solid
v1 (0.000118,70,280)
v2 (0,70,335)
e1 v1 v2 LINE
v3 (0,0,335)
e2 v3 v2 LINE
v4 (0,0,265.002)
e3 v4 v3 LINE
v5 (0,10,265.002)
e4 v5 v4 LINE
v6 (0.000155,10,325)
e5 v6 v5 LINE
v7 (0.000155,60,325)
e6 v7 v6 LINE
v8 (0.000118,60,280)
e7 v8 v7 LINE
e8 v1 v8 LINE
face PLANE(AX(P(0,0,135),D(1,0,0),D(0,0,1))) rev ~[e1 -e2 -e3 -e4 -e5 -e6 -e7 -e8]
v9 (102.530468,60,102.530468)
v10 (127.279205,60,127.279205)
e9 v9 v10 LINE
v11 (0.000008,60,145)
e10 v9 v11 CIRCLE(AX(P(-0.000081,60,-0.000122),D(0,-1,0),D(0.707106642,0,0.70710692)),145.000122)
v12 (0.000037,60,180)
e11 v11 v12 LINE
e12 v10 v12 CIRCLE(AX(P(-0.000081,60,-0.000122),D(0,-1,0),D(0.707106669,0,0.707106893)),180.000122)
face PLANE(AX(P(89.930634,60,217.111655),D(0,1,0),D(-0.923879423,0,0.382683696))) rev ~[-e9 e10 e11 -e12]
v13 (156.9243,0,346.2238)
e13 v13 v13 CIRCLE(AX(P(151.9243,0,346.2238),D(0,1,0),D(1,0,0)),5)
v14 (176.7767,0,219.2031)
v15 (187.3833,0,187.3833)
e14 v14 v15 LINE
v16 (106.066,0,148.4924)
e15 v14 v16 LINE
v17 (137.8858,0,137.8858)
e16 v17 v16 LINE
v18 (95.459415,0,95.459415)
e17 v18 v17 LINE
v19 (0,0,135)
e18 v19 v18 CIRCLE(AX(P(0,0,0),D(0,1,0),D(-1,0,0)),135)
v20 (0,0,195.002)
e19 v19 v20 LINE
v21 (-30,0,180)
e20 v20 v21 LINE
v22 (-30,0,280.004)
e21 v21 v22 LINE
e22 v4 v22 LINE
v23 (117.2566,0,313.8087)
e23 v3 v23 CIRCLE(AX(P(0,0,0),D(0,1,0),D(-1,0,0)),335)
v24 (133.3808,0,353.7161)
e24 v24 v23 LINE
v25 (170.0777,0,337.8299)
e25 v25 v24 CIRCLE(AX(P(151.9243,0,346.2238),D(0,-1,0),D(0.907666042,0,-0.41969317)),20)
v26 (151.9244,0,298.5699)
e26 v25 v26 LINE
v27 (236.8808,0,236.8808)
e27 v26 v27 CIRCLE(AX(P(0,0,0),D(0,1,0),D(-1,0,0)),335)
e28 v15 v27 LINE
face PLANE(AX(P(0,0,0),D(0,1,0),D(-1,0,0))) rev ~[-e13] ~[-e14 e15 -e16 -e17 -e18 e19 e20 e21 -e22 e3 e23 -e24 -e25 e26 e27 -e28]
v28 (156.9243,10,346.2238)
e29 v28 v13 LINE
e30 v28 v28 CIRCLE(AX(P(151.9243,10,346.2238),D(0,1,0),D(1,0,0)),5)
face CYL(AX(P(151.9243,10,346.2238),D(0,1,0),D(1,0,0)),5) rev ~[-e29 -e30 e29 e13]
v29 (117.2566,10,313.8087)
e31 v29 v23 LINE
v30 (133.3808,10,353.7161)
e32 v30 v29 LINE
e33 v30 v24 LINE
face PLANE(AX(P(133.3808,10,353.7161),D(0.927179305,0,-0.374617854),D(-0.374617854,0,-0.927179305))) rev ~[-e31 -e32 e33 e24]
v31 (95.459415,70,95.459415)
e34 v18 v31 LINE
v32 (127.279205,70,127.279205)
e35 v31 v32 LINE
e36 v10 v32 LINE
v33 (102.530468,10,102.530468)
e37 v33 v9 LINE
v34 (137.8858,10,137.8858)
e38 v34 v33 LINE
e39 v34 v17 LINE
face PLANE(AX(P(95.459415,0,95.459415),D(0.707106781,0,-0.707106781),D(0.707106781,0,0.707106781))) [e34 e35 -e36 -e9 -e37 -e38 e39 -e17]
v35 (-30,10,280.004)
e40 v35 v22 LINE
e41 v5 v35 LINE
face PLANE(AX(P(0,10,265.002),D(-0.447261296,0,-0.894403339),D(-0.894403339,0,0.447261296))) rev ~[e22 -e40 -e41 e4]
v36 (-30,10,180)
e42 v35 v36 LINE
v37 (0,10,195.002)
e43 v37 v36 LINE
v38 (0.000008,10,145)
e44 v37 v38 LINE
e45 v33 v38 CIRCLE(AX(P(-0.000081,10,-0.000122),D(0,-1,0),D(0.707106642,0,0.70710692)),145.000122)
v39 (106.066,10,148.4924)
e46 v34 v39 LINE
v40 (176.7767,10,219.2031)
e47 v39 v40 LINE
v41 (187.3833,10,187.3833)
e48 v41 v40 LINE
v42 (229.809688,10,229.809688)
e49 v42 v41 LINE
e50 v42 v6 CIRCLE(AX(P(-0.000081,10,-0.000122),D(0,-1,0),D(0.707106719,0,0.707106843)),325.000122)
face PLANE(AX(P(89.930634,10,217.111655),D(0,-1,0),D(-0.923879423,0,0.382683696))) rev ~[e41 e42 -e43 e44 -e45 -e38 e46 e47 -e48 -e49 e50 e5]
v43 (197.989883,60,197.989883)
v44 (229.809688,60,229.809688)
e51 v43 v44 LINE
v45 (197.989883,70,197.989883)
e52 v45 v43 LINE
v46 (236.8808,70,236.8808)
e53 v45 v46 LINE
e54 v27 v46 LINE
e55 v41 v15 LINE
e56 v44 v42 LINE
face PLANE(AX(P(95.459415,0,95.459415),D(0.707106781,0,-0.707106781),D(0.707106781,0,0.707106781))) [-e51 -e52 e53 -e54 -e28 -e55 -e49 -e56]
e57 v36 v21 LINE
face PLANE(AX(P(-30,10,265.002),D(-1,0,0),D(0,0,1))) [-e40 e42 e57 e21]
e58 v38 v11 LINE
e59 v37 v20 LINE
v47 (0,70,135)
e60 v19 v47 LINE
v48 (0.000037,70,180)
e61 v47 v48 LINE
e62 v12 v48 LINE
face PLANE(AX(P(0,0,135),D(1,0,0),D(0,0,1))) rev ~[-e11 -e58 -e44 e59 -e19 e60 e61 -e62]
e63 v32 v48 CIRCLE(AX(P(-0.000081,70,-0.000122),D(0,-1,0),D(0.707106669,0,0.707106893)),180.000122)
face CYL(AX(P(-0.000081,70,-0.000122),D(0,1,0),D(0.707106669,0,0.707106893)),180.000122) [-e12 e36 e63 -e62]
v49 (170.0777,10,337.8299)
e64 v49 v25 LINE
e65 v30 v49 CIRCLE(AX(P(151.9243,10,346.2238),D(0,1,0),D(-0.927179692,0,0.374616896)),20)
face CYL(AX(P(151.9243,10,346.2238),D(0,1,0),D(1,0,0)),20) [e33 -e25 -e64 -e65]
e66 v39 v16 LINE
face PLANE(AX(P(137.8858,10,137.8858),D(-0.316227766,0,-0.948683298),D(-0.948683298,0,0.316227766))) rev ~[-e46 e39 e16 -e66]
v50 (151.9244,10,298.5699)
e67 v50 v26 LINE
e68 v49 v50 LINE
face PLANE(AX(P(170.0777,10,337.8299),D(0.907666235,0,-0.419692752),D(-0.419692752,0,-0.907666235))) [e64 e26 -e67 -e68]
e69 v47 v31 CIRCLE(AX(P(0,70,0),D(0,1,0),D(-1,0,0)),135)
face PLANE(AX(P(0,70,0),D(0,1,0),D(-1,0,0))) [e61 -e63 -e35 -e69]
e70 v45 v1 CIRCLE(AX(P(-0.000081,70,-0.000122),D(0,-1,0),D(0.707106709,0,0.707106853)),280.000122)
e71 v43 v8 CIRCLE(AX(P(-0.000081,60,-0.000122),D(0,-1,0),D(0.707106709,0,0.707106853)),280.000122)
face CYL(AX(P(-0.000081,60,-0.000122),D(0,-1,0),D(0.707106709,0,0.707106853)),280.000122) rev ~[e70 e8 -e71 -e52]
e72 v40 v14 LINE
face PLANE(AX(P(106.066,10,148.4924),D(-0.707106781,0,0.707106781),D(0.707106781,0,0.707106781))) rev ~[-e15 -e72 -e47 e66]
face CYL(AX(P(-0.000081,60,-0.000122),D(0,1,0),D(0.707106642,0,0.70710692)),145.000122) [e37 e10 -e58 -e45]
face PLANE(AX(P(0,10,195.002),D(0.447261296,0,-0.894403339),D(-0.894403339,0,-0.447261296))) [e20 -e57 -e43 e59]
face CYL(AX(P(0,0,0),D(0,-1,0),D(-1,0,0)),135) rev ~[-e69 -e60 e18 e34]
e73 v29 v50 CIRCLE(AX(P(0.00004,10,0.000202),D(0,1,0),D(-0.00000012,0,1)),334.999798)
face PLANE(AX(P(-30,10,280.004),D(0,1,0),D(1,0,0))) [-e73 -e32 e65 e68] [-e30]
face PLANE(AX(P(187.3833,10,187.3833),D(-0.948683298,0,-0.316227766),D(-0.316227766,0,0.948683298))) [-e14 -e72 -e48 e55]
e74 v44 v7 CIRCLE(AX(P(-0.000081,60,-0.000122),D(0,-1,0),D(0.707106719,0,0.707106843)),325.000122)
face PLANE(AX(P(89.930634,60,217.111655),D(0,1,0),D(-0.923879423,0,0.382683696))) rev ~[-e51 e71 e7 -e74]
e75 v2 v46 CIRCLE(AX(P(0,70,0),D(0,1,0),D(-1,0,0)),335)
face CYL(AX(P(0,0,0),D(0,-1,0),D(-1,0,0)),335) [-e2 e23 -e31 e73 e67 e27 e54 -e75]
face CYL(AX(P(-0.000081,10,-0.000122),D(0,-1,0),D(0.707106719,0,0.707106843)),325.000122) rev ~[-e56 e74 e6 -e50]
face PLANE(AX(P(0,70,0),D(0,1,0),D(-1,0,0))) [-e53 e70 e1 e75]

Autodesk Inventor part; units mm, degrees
ref_plane "YZ Plane" through (0, 0, 0) normal (1, 0, 0) x (0, 1, 0)
ref_plane "XZ Plane" through (0, 0, 0) normal (0, 1, 0) x (-1, 0, 0)
ref_plane "XY Plane" through (0, 0, 0) normal (0, 0, 1) x (1, 0, 0)
sketch "Sketch1" plane through (0, 0, 0) normal (0, 1, 0) x (-1, 0, 0)
  circle A0 centre (0, 0) radius 335
  line L0 (335, 0) -> (-335, 0)
  line L1 (0, -335) -> (0, 335)
  line L2 (0, 0) -> (-236.8808, 236.8808)
  line L3 (0, 0) -> (236.8808, -236.8808)
  line L4 (0, 0) -> (236.8808, 236.8808)
  line L5 (0, 0) -> (-236.8808, -236.8808)
  circle A1 centre (0, 0) radius 135
  point P0 (-95.4594, 95.4594)
  point P1 (0, 135)
  dimension "d0" = 670
  dimension "d1" = 45
  dimension "d2" = 45
  dimension "d17" = 200
extrude "Extrusion1" add sketch "Sketch1" along normal blind 70 contours L1 A1 L2 A0
sketch "Sketch2" plane through (95.4594, 0, 95.4594) normal (0.7071068, 0, -0.7071068) x (-0.7071068, 0, -0.7071068)
  line L0 (-190, 60) -> (-10, 60)
  line L1 (-10, 60) -> (-10, 10)
  line L2 (-10, 10) -> (-190, 10)
  line L3 (-190, 10) -> (-190, 60)
  line L4 (-200, 0) -> (0, 0) projected
  line L5 (-200, 70) -> (0, 70) projected
  line L6 (-200, 0) -> (-200, 70) projected
  line L7 (0, 0) -> (0, 70) projected
  point P0 (135, 0)
  point P1 (0, 35)
  dimension "d6" = 10
  dimension "d7" = 10
  dimension "d8" = 10
  dimension "d9" = 10
sketch3d "3D Sketch1"
  arc A0 (95.4594, 70, 95.4594) -> (0, 70, 135) centre (0, 70, 0) ccw
sweep "Sweep1" cut profiles "Sketch2" path "3D Sketch1" contours L0 L1 L2 L3
sketch "Sketch3" plane through (95.4594, 0, 95.4594) normal (0.7071068, 0, -0.7071068) x (-0.7071068, 0, -0.7071068)
  line L0 (-101.8808, 70) -> (-200, 70) projected
  line L1 (32.4695, 60) -> (-94.8097, 60) projected
  line L2 (-145, 70) -> (-45, 70)
  line L3 (-45, 70) -> (-45, 60)
  line L4 (-45, 60) -> (-145, 60)
  line L5 (-145, 60) -> (-145, 70)
  line L6 (-200, 0) -> (-200, 70) projected
  line L7 (0, 0) -> (0, 70) projected
  point P0 (135, 0)
  dimension "d16" = 100
  dimension "d18" = 45
sketch3d "3D Sketch2"
  arc A0 (95.4594, 70, 95.4594) -> (0, 70, 135) centre (0, 70, 0) ccw
sweep "Sweep2" cut profiles "Sketch3" path "3D Sketch2"
sketch "Sketch5" plane through (0, 10, 325) normal (0, 1, 0) x (1, 0, 0)
  line L0 (0, 0) -> (0, 180) projected
  arc A0 (0, 145) -> (127.2792, 197.7208) centre (0, 325) ccw projected
  line L1 (127.2792, 197.7208) -> (95.4594, 229.5406) projected
  arc A1 (0, 190) -> (95.4594, 229.5406) centre (0, 325) ccw projected
  line L2 (0, 190) -> (0, 145) projected
  arc A2 (0, 45) -> (197.9899, 127.0101) centre (0, 325) ccw projected
  line L3 (0, 45) -> (0, -10) projected
  arc A3 (0, -10) -> (236.8808, 88.1192) centre (0, 325) ccw projected
  line L4 (236.8808, 88.1192) -> (197.9899, 127.0101) projected
  line L5 (0, 145) -> (-30, 145)
  line L6 (-30, 145) -> (-30, 44.996)
  line L7 (-30, 44.996) -> (0, 44.996)
  line L8 (0, 44.996) -> (0, 145)
  line L9 (0, 190) -> (0, -10) projected
  line L10 (0, 129.998) -> (-30, 129.998)
  line L11 (-30, 129.998) -> (-30, 59.998)
  line L12 (-30, 59.998) -> (0, 59.998)
  line L13 (0, 59.998) -> (0, 129.998)
  line L14 (0, 44.996) -> (-30, 145) construction
  line L15 (0, 145) -> (-30, 44.996) construction
  line L16 (0, 59.998) -> (-30, 129.998) construction
  line L17 (-30, 59.998) -> (0, 129.998) construction
  line L18 (-15, 94.998) -> (-30, 94.998) construction
  line L19 (-15, 94.998) -> (-30, 94.998) construction
  line L20 (0, 59.998) -> (-30, 44.996)
  line L21 (0, 129.998) -> (-30, 145)
  point P0 (0, 44.996)
  point P1 (0, 59.998)
  dimension "d21" = 30
  dimension "d27" = 70
extrude "Extrusion2" add sketch "Sketch5" against normal blind 10 contours L6 L12 L20 | L12 L6 L10 L0 | L10 L6 L21
sketch "Sketch6" plane through (-30, 10, 280.004) normal (0, 1, 0) x (1, 0, 0)
  line L0 (132.5305, 177.4736) -> (259.8097, 50.1943) projected
  arc A0 (30, 135.004) -> (132.5305, 177.4736) centre (30, 280.004) ccw projected
  line L1 (30, 85.002) -> (30, 135.004) projected
  line L2 (0, 100.004) -> (0, 0) projected
  line L3 (30, -44.996) -> (30, 15.002) projected
  arc A1 (30, -44.996) -> (259.8097, 50.1943) centre (30, 280.004) ccw projected
  arc A2 (30, 100.004) -> (157.2792, 152.7248) centre (30, 280.004) ccw projected
  line L4 (157.2792, 152.7248) -> (136.066, 131.5116)
  line L5 (136.066, 131.5116) -> (206.7767, 60.8009)
  line L6 (206.7767, 60.8009) -> (227.9899, 82.0141)
  line L7 (227.9899, 82.0141) -> (157.2792, 152.7248)
  arc A3 (30, 100.004) -> (157.2792, 152.7248) centre (30, 280.004) ccw projected
  arc A4 (30, 0.004) -> (227.9899, 82.0141) centre (30, 280.004) ccw projected
  line L8 (30, 0.004) -> (30, -54.996) projected
  arc A5 (30, -54.996) -> (266.8808, 43.1233) centre (30, 280.004) ccw projected
  line L9 (266.8808, 43.1233) -> (227.9899, 82.0141) projected
  arc A6 (30, 100.004) -> (157.2792, 152.7248) centre (30, 280.004) ccw projected
  line L10 (157.2792, 152.7248) -> (125.4594, 184.5446) projected
  arc A7 (30, 145.004) -> (125.4594, 184.5446) centre (30, 280.004) ccw projected
  line L11 (30, 145.004) -> (30, 100.004) projected
  line L12 (167.8858, 142.1182) -> (146.6726, 120.905)
  line L13 (146.6726, 120.905) -> (196.1701, 71.4075)
  line L14 (196.1701, 71.4075) -> (217.3833, 92.6207)
  line L15 (217.3833, 92.6207) -> (167.8858, 142.1182)
  line L16 (167.8858, 142.1182) -> (196.1701, 71.4075) construction
  line L17 (217.3833, 92.6207) -> (146.6726, 120.905) construction
  line L18 (157.2792, 152.7248) -> (206.7767, 60.8009) construction
  line L19 (227.9899, 82.0141) -> (136.066, 131.5116) construction
  line L20 (182.028, 106.7629) -> (171.4214, 96.1563) construction
  line L21 (182.028, 106.7629) -> (171.4214, 96.1563) construction
  line L22 (217.3833, 92.6207) -> (206.7767, 60.8009)
  line L23 (167.8858, 142.1182) -> (136.066, 131.5116)
  line L24 (30, 85.002) -> (0, 100.004) projected
  line L25 (0, 0) -> (30, 15.002) projected
  point P0 (207.7219, 63.6364)
  point P1 (217.3833, 92.6207)
  point P2 (167.8858, 142.1182)
  point P3 (205.637, 61.9406)
  dimension "d23" = 30
  dimension "d24" = 70
extrude "Extrusion3" cut sketch "Sketch6" against normal blind 10 contours L0 L14 L5 L12 | L12 L5 L23 | L22 A4 L5 L14 | L22 L5 A4
sketch "Sketch7" plane through (-30, 10, 280.004) normal (0, 1, 0) x (1, 0, 0)
  arc A0 (30, -44.996) -> (259.8097, 50.1943) centre (30, 280.004) ccw projected
  arc A1 (30, 0.004) -> (227.9899, 82.0141) centre (30, 280.004) ccw projected
  line L0 (30, 0.004) -> (30, -54.996) projected
  arc A2 (30, -54.996) -> (266.8808, 43.1233) centre (30, 280.004) ccw projected
  line L1 (266.8808, 43.1233) -> (227.9899, 82.0141) projected
  arc A3 (30, -54.996) -> (266.8808, 43.1233) centre (30, 280.004) ccw construction
  line L2 (30, 0.004) -> (266.8808, 43.1233) construction
  line L3 (266.8808, 43.1233) -> (227.9899, 82.0141) construction
  line L4 (266.8808, 43.1233) -> (217.3833, 92.6207) construction
  line L5 (227.9899, 82.0141) -> (227.9899, 82.0141) construction
  line L6 (217.3833, 92.6207) -> (259.8097, 50.1943) construction
  line L7 (227.9899, 82.0141) -> (227.9899, 82.0141) construction
  line L8 (227.9899, 82.0141) -> (227.9899, 82.0141) construction
  line L9 (227.9899, 82.0141) -> (227.9899, 82.0141) construction
  line L10 (227.9899, 82.0141) -> (39.9698, -54.8476) construction
  line L11 (143.7771, 20.7148) -> (196.6229, -99.7168) construction
  circle A4 centre (181.9243, -66.2198) radius 20
  line L12 (163.3808, -73.7121) -> (147.2566, -33.8047)
  line L13 (200.0777, -57.8259) -> (181.9244, -18.5659)
  circle A5 centre (181.9243, -66.2198) radius 5
  point P0 (181.9244, -18.5659)
  point P1 (147.2566, -33.8047)
  dimension "d28" = 40
  dimension "d31" = 10
extrude "Extrusion4" add sketch "Sketch7" against normal blind 10 contours A2 L13 A4 L12 | A4
properties part number "Carousel Fixed Track" material "PLA Plastic"
